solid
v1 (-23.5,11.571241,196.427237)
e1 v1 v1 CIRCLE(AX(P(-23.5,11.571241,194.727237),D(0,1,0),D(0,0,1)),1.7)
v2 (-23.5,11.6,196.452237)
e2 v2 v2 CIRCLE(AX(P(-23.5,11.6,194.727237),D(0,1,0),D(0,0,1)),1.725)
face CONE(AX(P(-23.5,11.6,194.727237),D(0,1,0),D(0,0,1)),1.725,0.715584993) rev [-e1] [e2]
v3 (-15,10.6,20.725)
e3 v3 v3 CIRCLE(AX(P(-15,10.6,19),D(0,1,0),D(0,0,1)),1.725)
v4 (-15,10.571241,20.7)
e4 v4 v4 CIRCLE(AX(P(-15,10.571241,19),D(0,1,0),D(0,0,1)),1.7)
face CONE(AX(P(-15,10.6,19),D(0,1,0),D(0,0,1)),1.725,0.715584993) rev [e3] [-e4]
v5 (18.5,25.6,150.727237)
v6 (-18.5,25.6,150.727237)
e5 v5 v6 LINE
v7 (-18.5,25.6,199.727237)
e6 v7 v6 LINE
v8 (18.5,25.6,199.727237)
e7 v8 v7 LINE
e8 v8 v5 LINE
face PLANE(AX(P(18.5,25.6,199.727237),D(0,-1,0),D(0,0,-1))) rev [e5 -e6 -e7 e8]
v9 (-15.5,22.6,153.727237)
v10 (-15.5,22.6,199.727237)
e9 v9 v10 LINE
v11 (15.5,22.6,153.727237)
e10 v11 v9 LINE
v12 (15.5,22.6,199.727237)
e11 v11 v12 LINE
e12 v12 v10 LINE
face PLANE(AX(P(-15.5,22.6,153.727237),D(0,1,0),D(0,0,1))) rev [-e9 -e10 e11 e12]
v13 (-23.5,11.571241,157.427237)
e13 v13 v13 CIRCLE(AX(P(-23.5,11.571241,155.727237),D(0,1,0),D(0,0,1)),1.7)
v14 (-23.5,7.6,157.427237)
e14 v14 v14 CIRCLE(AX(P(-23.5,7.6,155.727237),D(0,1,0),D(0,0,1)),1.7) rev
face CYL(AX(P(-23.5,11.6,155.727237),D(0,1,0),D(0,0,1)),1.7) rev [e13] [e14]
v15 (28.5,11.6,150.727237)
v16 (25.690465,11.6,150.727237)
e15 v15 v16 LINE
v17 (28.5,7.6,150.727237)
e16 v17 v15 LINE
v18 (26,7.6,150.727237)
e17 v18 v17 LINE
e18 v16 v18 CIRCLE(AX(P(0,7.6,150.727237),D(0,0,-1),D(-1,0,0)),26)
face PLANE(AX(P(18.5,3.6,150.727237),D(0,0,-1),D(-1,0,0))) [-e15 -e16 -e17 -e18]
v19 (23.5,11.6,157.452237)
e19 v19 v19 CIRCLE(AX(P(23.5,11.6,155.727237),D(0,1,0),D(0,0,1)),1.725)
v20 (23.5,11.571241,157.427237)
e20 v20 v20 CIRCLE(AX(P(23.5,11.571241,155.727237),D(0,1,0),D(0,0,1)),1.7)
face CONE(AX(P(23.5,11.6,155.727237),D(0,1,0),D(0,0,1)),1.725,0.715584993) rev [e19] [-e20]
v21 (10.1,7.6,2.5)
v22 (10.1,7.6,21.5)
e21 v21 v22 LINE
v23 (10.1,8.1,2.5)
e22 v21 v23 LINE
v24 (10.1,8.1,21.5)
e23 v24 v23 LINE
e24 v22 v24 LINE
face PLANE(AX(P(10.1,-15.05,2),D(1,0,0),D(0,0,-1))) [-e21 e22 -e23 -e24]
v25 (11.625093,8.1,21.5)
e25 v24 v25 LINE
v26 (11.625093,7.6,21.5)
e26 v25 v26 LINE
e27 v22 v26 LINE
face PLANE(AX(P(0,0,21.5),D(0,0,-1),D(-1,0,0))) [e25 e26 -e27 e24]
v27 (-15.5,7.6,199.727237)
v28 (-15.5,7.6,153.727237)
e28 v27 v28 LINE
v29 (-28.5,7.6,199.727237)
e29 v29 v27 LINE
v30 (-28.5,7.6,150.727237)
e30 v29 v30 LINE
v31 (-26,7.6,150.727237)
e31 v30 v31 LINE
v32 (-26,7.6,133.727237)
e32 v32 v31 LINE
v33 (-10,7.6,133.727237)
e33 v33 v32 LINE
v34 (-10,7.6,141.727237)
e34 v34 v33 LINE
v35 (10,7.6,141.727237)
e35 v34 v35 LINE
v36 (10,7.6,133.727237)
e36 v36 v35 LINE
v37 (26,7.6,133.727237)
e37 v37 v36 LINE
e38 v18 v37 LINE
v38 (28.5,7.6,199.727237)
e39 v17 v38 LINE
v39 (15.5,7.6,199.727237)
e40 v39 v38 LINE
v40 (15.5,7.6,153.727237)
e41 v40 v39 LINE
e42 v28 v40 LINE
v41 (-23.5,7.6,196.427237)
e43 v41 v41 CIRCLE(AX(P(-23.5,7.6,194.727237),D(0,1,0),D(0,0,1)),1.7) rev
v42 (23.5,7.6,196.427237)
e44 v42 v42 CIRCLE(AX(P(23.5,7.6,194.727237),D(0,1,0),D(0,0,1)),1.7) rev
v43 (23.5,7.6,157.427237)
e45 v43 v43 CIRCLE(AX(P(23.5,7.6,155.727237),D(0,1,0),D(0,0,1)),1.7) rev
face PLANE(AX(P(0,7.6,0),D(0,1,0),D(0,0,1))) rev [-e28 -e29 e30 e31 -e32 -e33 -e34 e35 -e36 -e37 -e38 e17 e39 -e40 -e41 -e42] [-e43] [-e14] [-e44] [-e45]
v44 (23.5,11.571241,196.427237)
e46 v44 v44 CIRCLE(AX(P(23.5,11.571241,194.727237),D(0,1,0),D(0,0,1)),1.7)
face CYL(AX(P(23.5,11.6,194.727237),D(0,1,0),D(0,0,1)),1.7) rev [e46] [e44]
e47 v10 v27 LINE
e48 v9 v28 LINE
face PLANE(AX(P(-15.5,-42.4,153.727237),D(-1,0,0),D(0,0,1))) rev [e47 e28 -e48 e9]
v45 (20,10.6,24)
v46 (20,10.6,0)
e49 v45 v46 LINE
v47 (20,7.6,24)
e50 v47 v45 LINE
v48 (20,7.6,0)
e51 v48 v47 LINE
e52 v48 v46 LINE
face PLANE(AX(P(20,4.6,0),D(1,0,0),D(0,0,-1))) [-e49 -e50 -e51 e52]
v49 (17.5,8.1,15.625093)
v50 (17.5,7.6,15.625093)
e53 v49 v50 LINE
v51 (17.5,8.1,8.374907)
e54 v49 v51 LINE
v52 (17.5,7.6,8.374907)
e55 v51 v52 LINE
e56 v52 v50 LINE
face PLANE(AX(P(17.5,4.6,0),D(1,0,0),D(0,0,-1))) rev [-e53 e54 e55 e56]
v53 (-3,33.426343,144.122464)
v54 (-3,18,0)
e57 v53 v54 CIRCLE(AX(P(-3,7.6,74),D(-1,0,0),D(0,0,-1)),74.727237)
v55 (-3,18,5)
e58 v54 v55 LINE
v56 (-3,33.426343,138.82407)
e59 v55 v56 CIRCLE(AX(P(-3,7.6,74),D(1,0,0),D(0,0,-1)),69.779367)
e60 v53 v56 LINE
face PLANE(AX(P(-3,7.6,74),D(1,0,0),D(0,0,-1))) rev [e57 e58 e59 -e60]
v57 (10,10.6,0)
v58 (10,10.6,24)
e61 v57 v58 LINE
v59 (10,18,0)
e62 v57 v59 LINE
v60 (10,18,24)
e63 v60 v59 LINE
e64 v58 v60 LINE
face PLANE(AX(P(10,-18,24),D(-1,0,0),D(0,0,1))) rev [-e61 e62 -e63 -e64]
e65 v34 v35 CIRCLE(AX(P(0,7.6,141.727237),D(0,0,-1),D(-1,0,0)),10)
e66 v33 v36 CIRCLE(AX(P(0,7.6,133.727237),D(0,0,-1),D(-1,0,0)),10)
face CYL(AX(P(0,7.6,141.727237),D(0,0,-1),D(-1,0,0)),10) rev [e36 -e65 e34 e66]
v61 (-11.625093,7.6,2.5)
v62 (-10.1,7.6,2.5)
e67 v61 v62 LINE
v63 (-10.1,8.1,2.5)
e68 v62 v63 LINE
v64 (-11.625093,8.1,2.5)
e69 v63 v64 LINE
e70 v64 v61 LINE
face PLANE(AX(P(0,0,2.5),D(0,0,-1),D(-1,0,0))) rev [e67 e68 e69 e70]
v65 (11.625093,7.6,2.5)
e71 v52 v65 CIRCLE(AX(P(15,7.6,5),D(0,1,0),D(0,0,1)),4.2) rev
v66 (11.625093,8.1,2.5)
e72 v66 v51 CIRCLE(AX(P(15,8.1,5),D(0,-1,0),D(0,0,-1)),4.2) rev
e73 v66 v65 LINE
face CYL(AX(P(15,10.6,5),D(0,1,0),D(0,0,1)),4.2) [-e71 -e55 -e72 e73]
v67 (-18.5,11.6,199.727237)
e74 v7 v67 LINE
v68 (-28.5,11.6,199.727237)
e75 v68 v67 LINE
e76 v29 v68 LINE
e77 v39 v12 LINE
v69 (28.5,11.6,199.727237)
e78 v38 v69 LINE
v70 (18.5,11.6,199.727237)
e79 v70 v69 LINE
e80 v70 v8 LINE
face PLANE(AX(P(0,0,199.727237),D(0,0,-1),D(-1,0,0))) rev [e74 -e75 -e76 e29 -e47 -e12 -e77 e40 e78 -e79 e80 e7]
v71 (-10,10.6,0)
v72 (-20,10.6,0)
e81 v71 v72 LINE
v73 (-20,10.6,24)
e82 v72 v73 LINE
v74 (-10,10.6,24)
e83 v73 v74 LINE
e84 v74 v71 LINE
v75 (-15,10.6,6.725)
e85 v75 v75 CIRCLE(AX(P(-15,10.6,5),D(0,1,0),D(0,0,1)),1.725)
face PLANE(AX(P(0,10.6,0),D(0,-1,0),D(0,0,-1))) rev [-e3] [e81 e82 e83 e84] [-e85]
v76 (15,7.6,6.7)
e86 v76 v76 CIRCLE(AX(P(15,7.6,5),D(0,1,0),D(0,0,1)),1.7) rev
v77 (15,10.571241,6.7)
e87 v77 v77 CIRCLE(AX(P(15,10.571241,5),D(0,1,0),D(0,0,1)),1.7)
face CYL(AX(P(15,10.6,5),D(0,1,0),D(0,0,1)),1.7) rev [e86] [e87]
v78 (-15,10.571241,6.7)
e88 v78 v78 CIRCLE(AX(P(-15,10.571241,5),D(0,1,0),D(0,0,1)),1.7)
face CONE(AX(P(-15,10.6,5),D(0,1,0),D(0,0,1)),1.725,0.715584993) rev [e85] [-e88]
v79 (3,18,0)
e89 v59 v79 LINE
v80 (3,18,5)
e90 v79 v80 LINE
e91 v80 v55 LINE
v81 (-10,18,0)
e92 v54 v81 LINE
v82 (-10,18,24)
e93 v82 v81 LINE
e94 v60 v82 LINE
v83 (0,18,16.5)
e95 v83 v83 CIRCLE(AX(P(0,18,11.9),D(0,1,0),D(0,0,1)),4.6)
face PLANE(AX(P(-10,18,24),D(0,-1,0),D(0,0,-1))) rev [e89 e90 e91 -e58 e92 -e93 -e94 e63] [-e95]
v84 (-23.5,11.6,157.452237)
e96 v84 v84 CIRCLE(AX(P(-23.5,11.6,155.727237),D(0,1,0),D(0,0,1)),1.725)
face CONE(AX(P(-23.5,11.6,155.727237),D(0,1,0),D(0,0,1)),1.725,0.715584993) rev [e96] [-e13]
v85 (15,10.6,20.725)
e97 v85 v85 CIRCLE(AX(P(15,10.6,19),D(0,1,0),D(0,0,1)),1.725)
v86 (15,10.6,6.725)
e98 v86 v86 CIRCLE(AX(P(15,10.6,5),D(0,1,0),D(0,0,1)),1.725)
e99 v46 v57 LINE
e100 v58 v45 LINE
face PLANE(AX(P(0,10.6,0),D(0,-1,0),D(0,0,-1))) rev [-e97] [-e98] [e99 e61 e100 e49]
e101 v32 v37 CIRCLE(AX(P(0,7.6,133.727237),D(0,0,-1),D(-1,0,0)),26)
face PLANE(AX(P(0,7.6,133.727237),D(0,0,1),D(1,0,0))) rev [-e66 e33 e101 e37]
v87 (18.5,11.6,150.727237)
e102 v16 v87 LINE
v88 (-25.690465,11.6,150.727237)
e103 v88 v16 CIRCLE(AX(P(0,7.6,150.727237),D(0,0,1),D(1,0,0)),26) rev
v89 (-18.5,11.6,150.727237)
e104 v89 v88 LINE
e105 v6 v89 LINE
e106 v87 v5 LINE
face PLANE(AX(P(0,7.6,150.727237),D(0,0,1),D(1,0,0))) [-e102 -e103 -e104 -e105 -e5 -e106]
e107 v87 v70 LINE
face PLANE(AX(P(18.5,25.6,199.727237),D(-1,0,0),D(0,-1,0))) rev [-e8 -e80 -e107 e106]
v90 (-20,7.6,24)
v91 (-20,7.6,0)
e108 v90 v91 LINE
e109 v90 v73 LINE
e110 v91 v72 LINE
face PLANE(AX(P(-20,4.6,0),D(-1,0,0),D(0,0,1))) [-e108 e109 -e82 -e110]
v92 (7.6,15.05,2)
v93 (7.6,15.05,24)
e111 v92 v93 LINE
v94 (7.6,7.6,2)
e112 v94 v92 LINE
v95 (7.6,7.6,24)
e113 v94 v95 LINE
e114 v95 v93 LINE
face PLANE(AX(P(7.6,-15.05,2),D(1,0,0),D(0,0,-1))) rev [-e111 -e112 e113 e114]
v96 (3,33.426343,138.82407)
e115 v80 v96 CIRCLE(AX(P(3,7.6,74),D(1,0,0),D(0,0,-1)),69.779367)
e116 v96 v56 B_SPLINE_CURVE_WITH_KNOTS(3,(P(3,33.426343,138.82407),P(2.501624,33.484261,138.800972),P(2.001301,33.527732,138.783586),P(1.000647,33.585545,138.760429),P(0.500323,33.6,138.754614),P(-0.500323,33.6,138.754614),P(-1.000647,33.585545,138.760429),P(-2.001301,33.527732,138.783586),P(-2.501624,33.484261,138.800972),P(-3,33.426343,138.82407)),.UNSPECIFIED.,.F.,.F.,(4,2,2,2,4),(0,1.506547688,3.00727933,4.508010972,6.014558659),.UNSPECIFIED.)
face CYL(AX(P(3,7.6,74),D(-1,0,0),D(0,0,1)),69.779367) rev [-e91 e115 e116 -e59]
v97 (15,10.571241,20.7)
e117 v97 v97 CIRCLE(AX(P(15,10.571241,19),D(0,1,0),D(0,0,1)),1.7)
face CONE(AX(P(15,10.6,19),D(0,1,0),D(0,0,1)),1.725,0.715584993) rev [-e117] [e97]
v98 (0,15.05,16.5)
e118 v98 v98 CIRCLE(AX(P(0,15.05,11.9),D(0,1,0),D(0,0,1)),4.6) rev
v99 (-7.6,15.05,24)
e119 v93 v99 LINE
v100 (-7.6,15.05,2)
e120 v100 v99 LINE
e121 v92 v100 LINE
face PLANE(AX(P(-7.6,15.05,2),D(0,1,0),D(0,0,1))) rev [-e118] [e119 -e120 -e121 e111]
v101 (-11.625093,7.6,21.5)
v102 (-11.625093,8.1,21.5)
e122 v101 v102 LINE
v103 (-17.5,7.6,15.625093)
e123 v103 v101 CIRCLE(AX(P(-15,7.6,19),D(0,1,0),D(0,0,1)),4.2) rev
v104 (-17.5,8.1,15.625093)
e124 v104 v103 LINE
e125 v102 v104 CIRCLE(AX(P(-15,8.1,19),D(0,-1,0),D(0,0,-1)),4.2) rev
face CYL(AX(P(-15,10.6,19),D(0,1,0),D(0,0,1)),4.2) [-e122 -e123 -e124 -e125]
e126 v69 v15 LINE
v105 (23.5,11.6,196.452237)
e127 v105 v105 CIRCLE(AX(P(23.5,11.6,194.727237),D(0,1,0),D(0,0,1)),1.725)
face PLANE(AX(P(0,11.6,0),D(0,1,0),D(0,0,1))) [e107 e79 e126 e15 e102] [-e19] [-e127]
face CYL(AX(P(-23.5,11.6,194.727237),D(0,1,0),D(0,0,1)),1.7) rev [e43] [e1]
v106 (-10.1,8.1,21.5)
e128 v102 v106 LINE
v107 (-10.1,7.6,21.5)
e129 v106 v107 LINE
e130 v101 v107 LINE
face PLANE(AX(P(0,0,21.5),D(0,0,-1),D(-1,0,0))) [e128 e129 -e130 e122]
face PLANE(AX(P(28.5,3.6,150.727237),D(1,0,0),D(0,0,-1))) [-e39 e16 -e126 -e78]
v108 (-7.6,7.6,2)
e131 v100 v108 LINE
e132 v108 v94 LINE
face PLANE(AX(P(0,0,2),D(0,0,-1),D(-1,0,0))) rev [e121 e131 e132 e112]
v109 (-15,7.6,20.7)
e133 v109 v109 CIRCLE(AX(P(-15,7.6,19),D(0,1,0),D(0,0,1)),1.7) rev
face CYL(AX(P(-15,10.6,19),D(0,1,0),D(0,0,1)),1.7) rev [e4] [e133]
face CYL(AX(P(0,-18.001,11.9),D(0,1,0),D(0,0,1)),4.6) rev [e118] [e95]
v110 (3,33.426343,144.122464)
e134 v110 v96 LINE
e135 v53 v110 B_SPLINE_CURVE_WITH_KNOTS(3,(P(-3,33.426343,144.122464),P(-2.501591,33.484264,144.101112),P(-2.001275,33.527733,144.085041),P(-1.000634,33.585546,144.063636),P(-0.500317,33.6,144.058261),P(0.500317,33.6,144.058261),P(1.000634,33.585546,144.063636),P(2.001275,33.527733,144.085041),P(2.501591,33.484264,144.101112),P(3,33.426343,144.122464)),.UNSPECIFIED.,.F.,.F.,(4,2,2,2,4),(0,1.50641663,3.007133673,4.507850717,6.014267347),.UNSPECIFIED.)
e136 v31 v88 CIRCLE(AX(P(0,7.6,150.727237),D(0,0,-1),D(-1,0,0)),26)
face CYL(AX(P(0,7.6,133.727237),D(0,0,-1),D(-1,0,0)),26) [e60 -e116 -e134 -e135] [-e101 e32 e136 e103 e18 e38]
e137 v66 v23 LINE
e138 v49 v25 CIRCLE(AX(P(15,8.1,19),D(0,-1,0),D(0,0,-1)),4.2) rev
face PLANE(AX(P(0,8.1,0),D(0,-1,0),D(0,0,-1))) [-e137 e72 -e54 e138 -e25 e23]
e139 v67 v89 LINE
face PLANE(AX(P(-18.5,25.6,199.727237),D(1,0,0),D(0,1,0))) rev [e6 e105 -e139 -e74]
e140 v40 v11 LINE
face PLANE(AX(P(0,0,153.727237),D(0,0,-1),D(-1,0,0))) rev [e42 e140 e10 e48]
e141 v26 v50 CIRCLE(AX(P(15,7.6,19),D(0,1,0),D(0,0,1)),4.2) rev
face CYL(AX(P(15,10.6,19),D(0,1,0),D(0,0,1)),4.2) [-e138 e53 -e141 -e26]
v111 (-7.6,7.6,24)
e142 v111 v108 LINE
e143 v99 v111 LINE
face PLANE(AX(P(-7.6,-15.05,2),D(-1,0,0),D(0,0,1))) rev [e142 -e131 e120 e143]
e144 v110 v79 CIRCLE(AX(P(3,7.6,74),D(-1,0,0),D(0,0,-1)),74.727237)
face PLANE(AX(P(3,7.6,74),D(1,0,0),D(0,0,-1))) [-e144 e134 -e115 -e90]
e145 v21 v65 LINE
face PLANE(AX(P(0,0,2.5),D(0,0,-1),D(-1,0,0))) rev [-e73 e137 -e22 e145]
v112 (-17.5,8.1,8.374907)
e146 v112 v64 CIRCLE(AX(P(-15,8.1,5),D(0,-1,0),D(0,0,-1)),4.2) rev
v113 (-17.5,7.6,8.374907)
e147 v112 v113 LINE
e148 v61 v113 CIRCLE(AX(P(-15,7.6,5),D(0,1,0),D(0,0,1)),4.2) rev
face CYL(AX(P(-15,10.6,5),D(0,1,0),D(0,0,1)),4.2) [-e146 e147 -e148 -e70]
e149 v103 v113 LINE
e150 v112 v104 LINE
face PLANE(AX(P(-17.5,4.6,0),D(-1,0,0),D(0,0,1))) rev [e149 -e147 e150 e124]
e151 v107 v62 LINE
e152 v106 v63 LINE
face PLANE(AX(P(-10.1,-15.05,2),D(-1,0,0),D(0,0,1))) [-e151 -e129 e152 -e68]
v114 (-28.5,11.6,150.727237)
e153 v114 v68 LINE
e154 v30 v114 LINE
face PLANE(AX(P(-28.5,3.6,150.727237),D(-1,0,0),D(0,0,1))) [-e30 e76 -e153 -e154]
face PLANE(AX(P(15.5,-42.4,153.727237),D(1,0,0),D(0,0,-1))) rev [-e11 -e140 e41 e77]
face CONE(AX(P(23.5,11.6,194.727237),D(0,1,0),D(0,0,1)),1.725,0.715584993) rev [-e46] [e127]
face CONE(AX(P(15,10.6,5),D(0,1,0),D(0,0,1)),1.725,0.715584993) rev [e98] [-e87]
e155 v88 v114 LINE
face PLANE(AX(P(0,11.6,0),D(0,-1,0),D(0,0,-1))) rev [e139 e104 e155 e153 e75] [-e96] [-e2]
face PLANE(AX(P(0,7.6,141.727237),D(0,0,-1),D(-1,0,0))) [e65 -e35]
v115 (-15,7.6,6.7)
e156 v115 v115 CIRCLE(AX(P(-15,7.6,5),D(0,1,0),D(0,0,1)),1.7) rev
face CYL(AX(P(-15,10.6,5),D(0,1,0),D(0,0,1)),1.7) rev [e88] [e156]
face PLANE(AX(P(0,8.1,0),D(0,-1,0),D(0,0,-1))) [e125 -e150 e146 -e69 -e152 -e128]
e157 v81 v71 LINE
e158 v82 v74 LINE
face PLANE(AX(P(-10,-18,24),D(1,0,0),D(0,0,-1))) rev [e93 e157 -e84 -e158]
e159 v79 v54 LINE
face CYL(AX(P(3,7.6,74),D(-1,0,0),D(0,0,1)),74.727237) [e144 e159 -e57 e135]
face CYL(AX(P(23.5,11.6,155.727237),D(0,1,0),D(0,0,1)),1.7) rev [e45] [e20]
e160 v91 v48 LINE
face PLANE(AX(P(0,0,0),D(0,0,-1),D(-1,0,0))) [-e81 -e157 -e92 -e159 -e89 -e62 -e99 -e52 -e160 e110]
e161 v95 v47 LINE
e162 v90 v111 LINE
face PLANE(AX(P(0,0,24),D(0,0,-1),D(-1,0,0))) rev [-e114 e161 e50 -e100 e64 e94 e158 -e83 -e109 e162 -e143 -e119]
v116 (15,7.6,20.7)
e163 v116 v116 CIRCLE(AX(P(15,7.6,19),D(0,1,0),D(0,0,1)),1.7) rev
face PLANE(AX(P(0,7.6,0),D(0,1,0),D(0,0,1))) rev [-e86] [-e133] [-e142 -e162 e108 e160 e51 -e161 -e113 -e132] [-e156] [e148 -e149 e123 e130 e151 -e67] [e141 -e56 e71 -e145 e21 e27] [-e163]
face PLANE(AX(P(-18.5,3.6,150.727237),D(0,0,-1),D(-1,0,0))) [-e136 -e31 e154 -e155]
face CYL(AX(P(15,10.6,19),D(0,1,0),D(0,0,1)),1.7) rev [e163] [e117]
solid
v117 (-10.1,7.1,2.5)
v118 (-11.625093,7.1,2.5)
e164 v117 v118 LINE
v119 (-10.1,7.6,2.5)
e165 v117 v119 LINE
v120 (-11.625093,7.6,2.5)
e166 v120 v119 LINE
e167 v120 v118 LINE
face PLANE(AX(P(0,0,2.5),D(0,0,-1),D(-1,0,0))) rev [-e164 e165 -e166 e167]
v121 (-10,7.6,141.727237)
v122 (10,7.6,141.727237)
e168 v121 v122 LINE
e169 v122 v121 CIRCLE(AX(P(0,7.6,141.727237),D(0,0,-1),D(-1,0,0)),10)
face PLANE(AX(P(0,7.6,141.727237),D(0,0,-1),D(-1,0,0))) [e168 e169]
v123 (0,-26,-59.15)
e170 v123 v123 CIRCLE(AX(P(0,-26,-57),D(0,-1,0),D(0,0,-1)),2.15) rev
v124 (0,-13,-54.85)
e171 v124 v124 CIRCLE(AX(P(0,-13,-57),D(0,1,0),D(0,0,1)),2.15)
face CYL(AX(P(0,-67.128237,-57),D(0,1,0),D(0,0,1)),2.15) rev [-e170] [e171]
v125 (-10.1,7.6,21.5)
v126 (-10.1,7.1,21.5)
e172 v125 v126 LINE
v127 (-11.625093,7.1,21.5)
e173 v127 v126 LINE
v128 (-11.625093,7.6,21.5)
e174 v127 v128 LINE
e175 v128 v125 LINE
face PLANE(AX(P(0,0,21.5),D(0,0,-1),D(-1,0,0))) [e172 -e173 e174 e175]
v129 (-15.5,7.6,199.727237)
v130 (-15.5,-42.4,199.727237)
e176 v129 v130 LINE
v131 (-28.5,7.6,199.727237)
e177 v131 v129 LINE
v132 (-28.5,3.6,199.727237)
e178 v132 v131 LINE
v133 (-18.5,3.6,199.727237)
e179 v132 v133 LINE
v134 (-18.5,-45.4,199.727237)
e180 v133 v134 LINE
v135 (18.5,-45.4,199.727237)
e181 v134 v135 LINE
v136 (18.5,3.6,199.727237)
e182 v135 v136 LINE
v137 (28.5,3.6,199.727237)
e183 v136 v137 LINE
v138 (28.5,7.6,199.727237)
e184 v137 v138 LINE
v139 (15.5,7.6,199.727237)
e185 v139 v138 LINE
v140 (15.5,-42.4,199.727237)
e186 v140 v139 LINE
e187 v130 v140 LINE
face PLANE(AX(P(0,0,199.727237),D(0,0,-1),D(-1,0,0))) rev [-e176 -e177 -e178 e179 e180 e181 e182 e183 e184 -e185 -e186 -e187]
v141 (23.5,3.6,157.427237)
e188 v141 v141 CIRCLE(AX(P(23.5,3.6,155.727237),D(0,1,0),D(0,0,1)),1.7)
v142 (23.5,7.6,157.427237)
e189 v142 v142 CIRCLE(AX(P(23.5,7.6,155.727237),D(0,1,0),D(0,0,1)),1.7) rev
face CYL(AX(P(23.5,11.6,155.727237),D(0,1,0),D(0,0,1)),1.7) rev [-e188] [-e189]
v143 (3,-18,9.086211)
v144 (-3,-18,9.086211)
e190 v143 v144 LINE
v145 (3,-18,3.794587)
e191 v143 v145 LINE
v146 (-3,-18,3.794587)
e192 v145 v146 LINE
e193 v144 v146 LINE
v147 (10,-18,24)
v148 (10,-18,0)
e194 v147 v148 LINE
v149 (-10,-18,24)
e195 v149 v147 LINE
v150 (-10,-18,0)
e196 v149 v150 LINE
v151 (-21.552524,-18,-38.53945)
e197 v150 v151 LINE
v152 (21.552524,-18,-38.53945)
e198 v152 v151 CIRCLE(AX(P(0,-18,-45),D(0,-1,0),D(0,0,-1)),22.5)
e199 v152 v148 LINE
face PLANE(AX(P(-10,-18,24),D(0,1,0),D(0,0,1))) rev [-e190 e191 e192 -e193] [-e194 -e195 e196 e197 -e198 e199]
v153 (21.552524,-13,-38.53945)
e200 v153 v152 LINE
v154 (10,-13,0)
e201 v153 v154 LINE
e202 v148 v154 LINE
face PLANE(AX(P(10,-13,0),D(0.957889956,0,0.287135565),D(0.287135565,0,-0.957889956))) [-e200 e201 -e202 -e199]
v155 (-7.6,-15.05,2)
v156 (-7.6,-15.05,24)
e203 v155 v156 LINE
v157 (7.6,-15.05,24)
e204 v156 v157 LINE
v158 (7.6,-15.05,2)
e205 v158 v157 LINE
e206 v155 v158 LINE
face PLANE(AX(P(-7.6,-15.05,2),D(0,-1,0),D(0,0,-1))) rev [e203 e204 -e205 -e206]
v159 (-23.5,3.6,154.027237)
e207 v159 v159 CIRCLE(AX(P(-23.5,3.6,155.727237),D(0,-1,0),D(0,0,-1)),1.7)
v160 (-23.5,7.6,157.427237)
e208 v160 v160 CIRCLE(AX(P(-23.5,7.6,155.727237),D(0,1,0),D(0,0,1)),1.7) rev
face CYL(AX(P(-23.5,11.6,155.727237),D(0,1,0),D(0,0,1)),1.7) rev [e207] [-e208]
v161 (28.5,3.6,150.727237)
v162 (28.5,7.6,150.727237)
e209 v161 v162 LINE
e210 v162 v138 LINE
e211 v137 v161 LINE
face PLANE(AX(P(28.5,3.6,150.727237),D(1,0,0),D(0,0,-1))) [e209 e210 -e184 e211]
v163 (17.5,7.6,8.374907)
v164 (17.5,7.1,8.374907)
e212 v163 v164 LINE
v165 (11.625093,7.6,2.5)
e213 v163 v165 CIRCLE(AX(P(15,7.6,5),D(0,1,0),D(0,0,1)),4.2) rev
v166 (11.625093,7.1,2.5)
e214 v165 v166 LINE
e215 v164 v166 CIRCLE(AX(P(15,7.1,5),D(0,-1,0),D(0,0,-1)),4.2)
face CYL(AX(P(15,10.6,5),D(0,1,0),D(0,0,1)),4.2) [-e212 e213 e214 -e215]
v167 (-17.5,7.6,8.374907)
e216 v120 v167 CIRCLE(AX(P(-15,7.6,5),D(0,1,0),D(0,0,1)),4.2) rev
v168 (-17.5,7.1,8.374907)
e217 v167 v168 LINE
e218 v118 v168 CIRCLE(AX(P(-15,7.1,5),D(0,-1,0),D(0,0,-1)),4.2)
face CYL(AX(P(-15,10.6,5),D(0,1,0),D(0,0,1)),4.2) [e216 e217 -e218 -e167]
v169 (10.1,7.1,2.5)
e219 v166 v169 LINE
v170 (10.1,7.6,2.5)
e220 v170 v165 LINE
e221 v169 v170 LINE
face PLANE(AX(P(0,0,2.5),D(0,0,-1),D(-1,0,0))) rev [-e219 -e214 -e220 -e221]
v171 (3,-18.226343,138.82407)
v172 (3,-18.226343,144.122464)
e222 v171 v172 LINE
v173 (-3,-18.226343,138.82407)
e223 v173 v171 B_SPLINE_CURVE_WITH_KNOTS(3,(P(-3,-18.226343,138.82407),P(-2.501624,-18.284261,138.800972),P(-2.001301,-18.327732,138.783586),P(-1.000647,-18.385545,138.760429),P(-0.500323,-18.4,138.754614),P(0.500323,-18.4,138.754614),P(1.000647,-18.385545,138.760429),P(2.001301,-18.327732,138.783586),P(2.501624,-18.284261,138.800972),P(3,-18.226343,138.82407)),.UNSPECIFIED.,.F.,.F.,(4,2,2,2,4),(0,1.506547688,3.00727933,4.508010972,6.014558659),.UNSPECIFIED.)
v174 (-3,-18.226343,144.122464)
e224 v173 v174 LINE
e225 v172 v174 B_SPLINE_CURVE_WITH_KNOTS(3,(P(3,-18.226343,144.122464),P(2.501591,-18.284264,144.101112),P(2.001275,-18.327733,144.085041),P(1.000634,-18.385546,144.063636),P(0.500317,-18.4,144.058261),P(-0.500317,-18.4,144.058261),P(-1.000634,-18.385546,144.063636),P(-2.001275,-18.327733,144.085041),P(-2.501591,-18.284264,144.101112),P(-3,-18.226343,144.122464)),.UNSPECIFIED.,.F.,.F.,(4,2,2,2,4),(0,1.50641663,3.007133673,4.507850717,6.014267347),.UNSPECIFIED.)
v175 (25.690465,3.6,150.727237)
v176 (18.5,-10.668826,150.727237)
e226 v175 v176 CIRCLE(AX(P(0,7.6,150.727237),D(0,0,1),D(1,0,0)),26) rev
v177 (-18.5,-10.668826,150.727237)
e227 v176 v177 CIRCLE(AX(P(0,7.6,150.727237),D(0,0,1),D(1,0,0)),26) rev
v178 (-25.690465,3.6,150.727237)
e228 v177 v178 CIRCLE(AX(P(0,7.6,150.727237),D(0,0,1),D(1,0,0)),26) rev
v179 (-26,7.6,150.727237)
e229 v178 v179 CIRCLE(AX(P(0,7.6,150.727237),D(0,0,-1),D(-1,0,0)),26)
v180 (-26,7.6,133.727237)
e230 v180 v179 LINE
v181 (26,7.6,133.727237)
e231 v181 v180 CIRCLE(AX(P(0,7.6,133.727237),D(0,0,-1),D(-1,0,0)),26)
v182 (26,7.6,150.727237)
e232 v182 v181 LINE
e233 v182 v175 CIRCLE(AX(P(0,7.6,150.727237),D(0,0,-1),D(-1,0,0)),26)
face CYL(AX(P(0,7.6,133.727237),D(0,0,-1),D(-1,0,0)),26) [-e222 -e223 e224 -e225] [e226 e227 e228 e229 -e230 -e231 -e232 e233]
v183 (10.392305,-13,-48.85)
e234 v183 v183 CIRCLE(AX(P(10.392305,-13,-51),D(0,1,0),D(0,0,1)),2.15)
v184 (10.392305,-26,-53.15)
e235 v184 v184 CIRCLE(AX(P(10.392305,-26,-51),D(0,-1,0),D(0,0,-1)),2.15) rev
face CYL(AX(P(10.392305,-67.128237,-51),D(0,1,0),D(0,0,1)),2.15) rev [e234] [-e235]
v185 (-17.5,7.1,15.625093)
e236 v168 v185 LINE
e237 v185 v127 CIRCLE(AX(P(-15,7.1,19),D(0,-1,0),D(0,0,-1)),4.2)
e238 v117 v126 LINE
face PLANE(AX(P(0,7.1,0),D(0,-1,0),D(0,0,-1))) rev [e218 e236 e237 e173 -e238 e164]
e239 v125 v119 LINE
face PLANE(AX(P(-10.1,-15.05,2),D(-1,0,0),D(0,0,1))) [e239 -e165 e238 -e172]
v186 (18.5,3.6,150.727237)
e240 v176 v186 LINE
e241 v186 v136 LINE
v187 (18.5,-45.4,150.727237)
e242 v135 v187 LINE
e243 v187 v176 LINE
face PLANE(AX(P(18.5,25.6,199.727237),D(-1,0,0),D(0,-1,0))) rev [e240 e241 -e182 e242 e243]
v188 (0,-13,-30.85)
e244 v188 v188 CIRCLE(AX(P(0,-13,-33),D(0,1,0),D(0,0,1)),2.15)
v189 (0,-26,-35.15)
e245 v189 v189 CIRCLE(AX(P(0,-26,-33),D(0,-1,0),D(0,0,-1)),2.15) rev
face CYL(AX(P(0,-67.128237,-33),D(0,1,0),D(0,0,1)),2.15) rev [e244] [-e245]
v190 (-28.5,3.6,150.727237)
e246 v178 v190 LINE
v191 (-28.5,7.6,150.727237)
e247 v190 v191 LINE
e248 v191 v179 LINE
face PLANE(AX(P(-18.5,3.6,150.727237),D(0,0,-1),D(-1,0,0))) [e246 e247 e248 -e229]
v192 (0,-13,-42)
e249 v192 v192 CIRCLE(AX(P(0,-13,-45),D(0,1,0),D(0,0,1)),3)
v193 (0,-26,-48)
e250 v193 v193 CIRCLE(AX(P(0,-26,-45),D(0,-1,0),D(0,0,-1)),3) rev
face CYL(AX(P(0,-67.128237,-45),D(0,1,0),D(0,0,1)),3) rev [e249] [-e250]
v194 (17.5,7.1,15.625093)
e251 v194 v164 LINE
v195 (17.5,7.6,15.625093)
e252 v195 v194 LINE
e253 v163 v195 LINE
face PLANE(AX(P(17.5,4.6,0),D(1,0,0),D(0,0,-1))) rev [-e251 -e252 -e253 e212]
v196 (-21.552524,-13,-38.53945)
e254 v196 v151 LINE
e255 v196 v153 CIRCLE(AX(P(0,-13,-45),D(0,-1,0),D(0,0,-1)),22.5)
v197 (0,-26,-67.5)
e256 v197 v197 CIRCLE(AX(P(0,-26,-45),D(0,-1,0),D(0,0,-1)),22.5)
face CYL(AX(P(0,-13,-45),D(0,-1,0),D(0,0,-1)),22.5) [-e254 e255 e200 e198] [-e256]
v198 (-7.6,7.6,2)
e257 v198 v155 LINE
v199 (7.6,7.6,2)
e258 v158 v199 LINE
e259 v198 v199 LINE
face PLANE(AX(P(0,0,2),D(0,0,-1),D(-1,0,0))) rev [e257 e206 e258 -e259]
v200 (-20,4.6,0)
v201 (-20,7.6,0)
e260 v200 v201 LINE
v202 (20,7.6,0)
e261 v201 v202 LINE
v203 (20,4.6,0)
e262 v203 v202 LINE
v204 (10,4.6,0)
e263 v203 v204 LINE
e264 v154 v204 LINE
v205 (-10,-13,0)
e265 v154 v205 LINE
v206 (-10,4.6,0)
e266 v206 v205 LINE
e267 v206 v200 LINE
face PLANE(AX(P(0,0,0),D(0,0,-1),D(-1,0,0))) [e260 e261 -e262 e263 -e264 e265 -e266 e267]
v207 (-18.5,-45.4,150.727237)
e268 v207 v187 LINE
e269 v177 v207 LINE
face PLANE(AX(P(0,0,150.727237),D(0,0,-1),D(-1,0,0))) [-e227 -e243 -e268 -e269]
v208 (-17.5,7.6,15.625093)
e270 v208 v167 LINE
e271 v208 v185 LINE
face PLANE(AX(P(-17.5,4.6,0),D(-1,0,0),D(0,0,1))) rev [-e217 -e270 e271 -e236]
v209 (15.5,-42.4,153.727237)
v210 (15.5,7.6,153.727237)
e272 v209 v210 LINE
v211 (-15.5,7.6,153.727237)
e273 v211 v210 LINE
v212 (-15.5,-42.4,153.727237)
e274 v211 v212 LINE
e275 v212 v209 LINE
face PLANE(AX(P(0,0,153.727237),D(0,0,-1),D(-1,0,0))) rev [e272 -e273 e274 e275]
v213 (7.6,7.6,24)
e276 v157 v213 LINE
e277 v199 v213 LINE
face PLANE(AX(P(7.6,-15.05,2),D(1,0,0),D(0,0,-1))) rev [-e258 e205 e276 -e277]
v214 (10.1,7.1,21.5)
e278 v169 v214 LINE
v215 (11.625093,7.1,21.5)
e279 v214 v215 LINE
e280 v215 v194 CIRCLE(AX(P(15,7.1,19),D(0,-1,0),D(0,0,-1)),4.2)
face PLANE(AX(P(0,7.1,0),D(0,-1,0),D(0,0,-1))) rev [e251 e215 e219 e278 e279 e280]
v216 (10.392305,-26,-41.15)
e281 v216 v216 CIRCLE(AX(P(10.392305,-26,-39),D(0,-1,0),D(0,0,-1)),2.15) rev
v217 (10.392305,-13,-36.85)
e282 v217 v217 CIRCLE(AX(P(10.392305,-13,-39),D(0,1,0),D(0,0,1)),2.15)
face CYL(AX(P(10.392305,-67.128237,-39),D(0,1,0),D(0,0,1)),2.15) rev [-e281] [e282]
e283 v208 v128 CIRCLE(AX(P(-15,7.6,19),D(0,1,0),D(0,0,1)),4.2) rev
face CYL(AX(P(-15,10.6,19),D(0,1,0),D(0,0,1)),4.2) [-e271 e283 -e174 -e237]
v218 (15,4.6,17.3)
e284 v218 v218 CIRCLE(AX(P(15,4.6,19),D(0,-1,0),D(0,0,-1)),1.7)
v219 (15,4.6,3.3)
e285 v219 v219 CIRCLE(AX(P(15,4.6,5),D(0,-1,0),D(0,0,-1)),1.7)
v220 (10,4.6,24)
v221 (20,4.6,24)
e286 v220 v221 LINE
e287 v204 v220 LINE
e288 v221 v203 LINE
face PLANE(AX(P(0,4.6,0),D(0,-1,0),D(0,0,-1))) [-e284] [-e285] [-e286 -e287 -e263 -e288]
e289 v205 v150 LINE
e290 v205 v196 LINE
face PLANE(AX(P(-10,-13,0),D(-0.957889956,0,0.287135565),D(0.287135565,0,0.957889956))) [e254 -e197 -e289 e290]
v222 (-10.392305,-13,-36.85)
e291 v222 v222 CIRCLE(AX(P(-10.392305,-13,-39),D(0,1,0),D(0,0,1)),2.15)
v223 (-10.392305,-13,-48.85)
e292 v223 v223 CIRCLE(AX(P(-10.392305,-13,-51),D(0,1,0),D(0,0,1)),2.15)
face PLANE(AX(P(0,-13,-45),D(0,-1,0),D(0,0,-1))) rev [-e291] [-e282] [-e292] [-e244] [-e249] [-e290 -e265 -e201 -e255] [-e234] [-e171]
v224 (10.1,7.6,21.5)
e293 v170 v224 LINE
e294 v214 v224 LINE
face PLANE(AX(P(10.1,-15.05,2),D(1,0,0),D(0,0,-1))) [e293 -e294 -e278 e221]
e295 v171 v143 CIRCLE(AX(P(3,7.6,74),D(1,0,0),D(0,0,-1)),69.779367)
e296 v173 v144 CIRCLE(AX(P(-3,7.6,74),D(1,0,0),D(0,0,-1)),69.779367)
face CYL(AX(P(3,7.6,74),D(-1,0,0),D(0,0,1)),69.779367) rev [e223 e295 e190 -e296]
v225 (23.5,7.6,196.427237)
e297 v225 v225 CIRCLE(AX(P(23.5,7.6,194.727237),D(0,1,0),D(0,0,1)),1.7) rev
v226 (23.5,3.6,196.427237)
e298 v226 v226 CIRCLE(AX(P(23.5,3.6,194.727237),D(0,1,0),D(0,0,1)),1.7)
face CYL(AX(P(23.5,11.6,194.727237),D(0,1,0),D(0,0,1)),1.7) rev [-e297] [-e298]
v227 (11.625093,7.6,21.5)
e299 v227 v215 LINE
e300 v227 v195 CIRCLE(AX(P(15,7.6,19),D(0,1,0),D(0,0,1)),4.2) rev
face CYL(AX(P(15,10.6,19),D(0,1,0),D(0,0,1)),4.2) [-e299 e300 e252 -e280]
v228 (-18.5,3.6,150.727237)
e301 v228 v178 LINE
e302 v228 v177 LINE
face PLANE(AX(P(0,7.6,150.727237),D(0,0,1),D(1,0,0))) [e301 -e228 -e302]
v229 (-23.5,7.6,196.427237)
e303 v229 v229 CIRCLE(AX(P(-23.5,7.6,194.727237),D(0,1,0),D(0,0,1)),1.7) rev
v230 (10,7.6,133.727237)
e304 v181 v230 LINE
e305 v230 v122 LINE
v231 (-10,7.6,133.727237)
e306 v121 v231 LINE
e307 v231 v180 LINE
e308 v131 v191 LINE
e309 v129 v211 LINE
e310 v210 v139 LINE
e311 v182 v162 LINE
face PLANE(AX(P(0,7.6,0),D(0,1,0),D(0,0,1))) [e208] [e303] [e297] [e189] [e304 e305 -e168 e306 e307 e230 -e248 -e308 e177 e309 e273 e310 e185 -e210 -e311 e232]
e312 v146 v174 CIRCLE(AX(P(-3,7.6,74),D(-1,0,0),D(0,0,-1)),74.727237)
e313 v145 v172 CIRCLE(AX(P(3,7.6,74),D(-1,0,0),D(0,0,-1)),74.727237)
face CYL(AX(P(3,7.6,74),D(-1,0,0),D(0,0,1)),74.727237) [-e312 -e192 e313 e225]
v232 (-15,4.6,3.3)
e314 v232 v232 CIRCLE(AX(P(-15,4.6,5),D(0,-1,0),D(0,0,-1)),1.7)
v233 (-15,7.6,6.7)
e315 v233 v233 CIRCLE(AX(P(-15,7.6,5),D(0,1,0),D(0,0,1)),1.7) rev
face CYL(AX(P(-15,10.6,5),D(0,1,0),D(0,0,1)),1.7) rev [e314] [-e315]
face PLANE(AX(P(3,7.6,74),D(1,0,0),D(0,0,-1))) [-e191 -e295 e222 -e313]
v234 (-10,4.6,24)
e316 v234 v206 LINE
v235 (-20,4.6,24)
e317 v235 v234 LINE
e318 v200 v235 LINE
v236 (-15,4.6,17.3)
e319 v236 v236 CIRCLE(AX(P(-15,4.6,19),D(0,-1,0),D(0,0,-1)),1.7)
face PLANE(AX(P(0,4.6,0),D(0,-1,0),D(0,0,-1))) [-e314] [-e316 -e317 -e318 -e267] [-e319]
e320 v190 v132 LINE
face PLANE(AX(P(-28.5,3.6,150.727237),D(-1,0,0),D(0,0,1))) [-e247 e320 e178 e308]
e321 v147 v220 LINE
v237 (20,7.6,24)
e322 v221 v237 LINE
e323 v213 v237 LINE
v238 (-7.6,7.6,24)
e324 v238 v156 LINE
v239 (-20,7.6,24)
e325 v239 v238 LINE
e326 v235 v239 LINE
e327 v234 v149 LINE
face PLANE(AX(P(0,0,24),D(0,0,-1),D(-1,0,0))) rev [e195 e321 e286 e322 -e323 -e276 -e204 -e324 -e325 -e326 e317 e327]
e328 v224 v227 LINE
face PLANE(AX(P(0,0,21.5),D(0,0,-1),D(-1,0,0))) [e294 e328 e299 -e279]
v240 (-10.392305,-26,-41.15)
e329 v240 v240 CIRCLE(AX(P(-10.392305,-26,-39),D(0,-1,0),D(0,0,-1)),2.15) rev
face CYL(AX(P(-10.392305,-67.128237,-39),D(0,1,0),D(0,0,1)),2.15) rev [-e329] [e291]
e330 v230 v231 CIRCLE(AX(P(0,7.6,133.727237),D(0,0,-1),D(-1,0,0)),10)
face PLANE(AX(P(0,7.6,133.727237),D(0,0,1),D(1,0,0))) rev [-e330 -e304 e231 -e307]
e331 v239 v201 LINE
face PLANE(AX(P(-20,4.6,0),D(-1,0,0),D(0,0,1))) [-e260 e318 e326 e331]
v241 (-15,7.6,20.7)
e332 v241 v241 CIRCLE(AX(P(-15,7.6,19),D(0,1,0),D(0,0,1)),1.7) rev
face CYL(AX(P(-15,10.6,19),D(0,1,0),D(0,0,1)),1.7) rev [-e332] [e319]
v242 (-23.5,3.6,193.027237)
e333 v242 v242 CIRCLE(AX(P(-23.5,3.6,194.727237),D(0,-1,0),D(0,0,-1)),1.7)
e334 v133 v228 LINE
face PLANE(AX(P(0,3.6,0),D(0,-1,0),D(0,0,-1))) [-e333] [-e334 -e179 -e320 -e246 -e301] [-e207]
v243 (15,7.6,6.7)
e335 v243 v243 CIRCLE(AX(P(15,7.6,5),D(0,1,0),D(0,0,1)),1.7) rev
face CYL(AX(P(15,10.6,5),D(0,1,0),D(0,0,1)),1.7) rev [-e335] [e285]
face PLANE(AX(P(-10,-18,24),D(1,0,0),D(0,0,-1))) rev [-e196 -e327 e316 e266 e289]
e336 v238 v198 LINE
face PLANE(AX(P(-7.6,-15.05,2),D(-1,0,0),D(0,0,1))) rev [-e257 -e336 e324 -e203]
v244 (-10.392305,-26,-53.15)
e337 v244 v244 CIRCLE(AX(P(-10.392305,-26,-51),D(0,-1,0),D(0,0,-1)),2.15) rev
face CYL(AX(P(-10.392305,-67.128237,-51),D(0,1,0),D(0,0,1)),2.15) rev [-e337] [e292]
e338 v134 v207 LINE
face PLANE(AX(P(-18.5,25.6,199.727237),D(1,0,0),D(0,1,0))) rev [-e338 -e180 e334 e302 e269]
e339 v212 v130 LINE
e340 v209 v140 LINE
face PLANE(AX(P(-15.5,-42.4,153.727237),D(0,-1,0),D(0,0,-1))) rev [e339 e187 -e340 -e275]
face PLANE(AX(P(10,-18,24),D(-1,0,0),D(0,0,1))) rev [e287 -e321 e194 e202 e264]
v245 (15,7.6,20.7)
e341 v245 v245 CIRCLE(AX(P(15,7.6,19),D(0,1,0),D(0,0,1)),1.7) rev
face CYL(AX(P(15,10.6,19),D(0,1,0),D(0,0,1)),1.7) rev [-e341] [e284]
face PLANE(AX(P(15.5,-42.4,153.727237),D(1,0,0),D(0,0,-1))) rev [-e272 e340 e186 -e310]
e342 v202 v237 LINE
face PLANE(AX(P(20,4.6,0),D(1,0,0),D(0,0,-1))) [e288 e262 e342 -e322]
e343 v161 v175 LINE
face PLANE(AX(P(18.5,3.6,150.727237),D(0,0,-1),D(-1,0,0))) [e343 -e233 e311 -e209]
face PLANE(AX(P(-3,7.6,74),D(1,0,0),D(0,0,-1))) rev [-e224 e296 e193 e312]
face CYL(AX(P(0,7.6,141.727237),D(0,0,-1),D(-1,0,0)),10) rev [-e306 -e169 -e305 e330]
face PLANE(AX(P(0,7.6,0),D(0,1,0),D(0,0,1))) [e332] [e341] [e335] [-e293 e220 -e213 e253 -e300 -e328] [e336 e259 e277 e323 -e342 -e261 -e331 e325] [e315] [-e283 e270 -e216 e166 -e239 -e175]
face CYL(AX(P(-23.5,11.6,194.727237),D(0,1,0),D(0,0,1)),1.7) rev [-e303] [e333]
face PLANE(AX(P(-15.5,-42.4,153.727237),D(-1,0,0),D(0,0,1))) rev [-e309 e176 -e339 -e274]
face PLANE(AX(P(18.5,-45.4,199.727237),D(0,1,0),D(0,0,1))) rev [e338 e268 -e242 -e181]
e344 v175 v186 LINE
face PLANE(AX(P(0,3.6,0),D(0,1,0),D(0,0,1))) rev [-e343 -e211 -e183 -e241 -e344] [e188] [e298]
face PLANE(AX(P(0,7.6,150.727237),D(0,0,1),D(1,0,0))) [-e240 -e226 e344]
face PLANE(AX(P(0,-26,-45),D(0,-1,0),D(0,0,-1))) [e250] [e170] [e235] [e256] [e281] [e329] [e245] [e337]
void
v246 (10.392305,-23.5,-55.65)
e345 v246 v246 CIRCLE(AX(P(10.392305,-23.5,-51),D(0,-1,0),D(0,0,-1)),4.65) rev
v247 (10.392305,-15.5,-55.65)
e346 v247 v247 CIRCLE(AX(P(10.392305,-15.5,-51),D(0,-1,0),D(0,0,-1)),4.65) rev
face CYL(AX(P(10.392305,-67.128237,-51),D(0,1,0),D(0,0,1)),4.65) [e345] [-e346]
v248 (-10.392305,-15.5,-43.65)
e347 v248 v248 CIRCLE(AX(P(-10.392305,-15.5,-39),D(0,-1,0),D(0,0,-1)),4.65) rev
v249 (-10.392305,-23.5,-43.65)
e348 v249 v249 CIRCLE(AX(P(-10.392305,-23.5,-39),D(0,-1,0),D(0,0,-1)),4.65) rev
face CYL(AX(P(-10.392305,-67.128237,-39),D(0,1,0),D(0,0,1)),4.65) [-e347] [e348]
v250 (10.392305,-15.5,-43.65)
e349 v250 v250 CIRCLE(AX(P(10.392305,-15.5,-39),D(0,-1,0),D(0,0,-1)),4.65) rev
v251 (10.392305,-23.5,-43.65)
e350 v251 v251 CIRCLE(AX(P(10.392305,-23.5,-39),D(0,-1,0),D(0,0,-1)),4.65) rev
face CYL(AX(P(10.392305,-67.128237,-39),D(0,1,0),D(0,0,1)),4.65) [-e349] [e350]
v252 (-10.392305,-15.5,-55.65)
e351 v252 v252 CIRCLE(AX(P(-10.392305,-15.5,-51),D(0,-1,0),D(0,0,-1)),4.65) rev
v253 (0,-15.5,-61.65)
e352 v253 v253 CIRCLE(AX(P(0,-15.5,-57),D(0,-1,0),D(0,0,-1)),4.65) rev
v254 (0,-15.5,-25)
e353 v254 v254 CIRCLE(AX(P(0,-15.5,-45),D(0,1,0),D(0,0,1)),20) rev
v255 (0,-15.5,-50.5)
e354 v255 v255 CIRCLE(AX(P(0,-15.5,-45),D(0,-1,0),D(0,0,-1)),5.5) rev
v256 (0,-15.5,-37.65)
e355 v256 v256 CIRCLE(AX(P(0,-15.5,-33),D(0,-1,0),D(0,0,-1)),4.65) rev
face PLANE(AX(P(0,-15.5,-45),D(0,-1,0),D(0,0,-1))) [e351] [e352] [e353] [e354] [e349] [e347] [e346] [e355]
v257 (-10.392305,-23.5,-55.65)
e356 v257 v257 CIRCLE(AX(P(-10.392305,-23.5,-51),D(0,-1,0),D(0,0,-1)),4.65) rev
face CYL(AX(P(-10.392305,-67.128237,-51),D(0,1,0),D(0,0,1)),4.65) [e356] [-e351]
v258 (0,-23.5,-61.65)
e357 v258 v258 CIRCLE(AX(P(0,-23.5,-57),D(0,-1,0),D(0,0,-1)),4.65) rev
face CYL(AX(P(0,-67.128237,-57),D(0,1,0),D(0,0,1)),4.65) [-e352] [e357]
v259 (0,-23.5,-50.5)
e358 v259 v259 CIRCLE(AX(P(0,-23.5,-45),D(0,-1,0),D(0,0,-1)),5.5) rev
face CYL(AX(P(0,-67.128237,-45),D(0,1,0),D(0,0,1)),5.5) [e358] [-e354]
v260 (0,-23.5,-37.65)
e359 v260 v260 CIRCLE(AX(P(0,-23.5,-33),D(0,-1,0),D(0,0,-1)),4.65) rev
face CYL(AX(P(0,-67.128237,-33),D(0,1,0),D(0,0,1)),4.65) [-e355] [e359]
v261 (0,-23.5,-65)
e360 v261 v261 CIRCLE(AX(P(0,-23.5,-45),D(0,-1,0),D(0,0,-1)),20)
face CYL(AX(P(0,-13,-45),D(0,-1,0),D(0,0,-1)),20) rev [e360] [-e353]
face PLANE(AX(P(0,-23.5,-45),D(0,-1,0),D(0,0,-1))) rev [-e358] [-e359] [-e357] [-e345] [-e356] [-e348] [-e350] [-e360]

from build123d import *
from build123d.topology import SkipClean

# Parameters (mm, degrees)
SKETCH_1_W           = 20
SKETCH_1_H           = 36
EXTRUDE_1_DEPTH      = 24
SKETCH_2_W           = 15.2
SKETCH_2_H           = 30.1
CUT_EXTRUDE_1_DEPTH  = 22
CUT_EXTRUDE_2_REACH  = 46.407
SKETCH_3_R           = 4.6
EXTRUDE_2_DEPTH      = 3
EXTRUDE_2_DEPTH_BACK = 3
SKETCH_6_W           = 35
SKETCH_6_H           = 26
SKETCH_7_R           = 23
CUT_EXTRUDE_3_DEPTH  = 18
SKETCH_9_R           = 10
CUT_EXTRUDE_4_DEPTH  = 8
EXTRUDE_4_DEPTH      = 3
EXTRUDE_4_DEPTH_BACK = 3
SKETCH_12_W          = 10
SKETCH_12_H          = 24
EXTRUDE_5_DEPTH      = 5
SKETCH_16_R          = 22.5
EXTRUDE_6_DEPTH      = 8
SKETCH_17_R          = 3
SKETCH_17_R_2        = 2.15
CUT_EXTRUDE_6_DEPTH  = 13
CUT_EXTRUDE_START    = -18
SKETCH_18_R          = 26
CUT_EXTRUDE_7_DEPTH  = 18
SKETCH_20_W          = 37
SKETCH_20_H          = 71
EXTRUDE_7_DEPTH      = 49
SHELL_START          = -23.5
SHELL_1_OUTLINE_R    = 20
SHELL_1_OUTLINE_R_2  = 4.65
SHELL_1_OUTLINE_R_3  = 5.5
SHELL_1_DEPTH        = 8
SHELL_START_2        = 7.1
SHELL_1_2_DEPTH      = 1
SKETCH_21_W          = 31
SKETCH_21_H          = 65
CUT_EXTRUDE_8_DEPTH  = 46
EXTRUDE_8_DEPTH      = 4
EXTRUDE_8_DEPTH_BACK = 4
SKETCH_22_W          = 10
SKETCH_22_H          = 49


# Read off the part's stored shape, not the designer's step: M3 すきま穴1, ｼｪﾙ1, M3 すきま穴2
with BuildPart() as part:
    # ｽｹｯﾁ1 → ﾎﾞｽ - 押し出し1 (new body)
    with BuildSketch(Plane.XY):
        Rectangle(SKETCH_1_W, SKETCH_1_H)
    extrude(amount=EXTRUDE_1_DEPTH)

    # ｽｹｯﾁ2 → ｶｯﾄ - 押し出し1 (cut)
    with BuildSketch(Plane.XY.offset(24)):
        Rectangle(SKETCH_2_W, SKETCH_2_H)
    extrude(amount=-CUT_EXTRUDE_1_DEPTH, mode=Mode.SUBTRACT)

    # ｽｹｯﾁ3 → ｶｯﾄ - 押し出し2 (cut, up to next)
    with BuildSketch(Plane(origin=(0, 18, 0), x_dir=(1, 0, 0), z_dir=(0, 1, 0)), mode=Mode.PRIVATE) as cut_extrude_2_sk1:
        with Locations(Location((0, -11.9, 0), (0, 0, 270))):
            Circle(SKETCH_3_R)
    cut_extrude_2_tool1 = extrude(cut_extrude_2_sk1.sketch, amount=-CUT_EXTRUDE_2_REACH, mode=Mode.PRIVATE) & part.part
    add(cut_extrude_2_tool1.solids().sort_by_distance((0, 18, 11.9))[0], mode=Mode.SUBTRACT)

    # ｽｹｯﾁ4 → ﾎﾞｽ - 押し出し2 (add, two sides: drawn at the far end of the back side and taken through both)
    with BuildSketch(Plane.ZY.offset(-EXTRUDE_2_DEPTH_BACK)):
        with BuildLine():
            Line((0, 18), (5, 18))
            ThreePointArc((5, 18), (143.334159834, 15.469833551), (9.086211018, -18))
            Line((9.086211018, -18), (3.794587103, -18))
            ThreePointArc((3.794587103, -18), (148.315545327, 15.433244719), (0, 18))
        make_face()
    extrude(amount=EXTRUDE_2_DEPTH + EXTRUDE_2_DEPTH_BACK)

    # ｽｹｯﾁ6 → 回転1 (revolve)
    with BuildSketch(Plane.ZY, mode=Mode.PRIVATE) as revolve_1_sk:
        with Locations((151.227237337, 20.6)):
            Rectangle(SKETCH_6_W, SKETCH_6_H)
    revolve(revolve_1_sk.sketch.rotate(Axis((0, 7.6, 133.727237337), (0, 0, 1)), 90), axis=Axis((0, 7.6, 133.727237337), (0, 0, 1)))

    # ｽｹｯﾁ7 → ｶｯﾄ - 押し出し3 (cut)
    with BuildSketch(Plane.XY.offset(168.727237337)):
        with Locations((0, 7.6)):
            Circle(SKETCH_7_R)
    extrude(amount=-CUT_EXTRUDE_3_DEPTH, mode=Mode.SUBTRACT)

    # ｽｹｯﾁ9 → ｶｯﾄ - 押し出し4 (cut)
    with BuildSketch(Plane(origin=(0, 0, 133.727237337), x_dir=(-1, 0, 0), z_dir=(0, 0, -1))):
        with Locations((0, 7.6)):
            Circle(SKETCH_9_R)
    extrude(amount=-CUT_EXTRUDE_4_DEPTH, mode=Mode.SUBTRACT)

    # ｽｹｯﾁ12 → ﾎﾞｽ - 押し出し4 (add, two sides: drawn at the far end of the back side and taken through both)
    with BuildSketch(Plane(origin=(0, 7.6, 0), x_dir=(1, 0, 0), z_dir=(0, 1, 0)).offset(-EXTRUDE_4_DEPTH_BACK)):
        with Locations((-15, -12)):
            Rectangle(SKETCH_12_W, SKETCH_12_H)
        with Locations((15, -12)):
            Rectangle(SKETCH_12_W, SKETCH_12_H)
    extrude(amount=EXTRUDE_4_DEPTH + EXTRUDE_4_DEPTH_BACK)

    # M3 すきま穴1 outline → M3 すきま穴1 (revolve, cut)
    with BuildSketch(Plane(origin=(-15, 0, 5), x_dir=(1, 0, 0), z_dir=(0, 0, 1))):
        Polygon((0, 4.6), (1.7, 4.6), (1.7, 10.57124079), (1.725, 10.6), (0, 10.6), align=None)
    revolve(axis=Axis((-15, 0, 5), (0, 1, 0)), mode=Mode.SUBTRACT)

    # Hole Wizard M3 _1 2 outline → Hole Wizard M3 _1 2 (revolve, cut)
    with BuildSketch(Plane(origin=(15, 0, 19), x_dir=(1, 0, 0), z_dir=(0, 0, 1))):
        Polygon((0, 4.6), (1.7, 4.6), (1.7, 10.57124079), (1.725, 10.6), (0, 10.6), align=None)
    revolve(axis=Axis((15, 0, 19), (0, 1, 0)), mode=Mode.SUBTRACT)

    # Hole Wizard M3 _1 3 outline → Hole Wizard M3 _1 3 (revolve, cut)
    with BuildSketch(Plane(origin=(-15, 0, 19), x_dir=(1, 0, 0), z_dir=(0, 0, 1))):
        Polygon((0, 4.6), (1.7, 4.6), (1.7, 10.57124079), (1.725, 10.6), (0, 10.6), align=None)
    revolve(axis=Axis((-15, 0, 19), (0, 1, 0)), mode=Mode.SUBTRACT)

    # Hole Wizard M3 _1 4 outline → Hole Wizard M3 _1 4 (revolve, cut)
    with BuildSketch(Plane(origin=(15, 0, 5), x_dir=(1, 0, 0), z_dir=(0, 0, 1))):
        Polygon((0, 4.6), (1.7, 4.6), (1.7, 10.57124079), (1.725, 10.6), (0, 10.6), align=None)
    revolve(axis=Axis((15, 0, 5), (0, 1, 0)), mode=Mode.SUBTRACT)


with BuildPart() as body_2:
    # Split Bodies 1: the piece on the far side of the plane
    add(part.part)
    split(bisect_by=Plane.ZX.offset(7.6), keep=Keep.BOTTOM)

    # ｽｹｯﾁ15 → ﾎﾞｽ - 押し出し5 (add)
    with BuildSketch(Plane.XZ.offset(18)):
        with BuildLine():
            Line((-10, 0), (-21.552524001, -38.539449778))
            ThreePointArc((-21.552524001, -38.539449778), (0, -67.5), (21.552524001, -38.539449778))
            Line((21.552524001, -38.539449778), (10, 0))
            Line((10, 0), (-10, 0))
        make_face()
    extrude(amount=-EXTRUDE_5_DEPTH)

    # ｽｹｯﾁ16 → ﾎﾞｽ - 押し出し6 (add)
    with SkipClean():  # the faces are left unmerged after this step: merging them gives an invalid solid
        with BuildSketch(Plane.XZ.offset(18)):
            with Locations(Location((0, -45, 0), (0, 0, 270))):
                Circle(SKETCH_16_R)
        extrude(amount=EXTRUDE_6_DEPTH)

    # ｽｹｯﾁ17 → ｶｯﾄ - 押し出し6 (cut)
    with SkipClean():  # the faces are left unmerged after this step: merging them gives an invalid solid
        with BuildSketch(Plane(origin=(0, -13, 0), x_dir=(1, 0, 0), z_dir=(0, 1, 0))):
            with Locations(Location((0, 45, 0), (0, 0, 270))):
                Circle(SKETCH_17_R)
            with Locations(Location((0, 57, 0), (0, 0, 270))):
                Circle(SKETCH_17_R_2)
            with Locations(Location((10.392304845, 51, 0), (0, 0, 270))):
                Circle(SKETCH_17_R_2)
            with Locations(Location((10.392304845, 39, 0), (0, 0, 270))):
                Circle(SKETCH_17_R_2)
            with Locations(Location((0, 33, 0), (0, 0, 270))):
                Circle(SKETCH_17_R_2)
            with Locations(Location((-10.392304845, 39, 0), (0, 0, 270))):
                Circle(SKETCH_17_R_2)
            with Locations(Location((-10.392304845, 51, 0), (0, 0, 270))):
                Circle(SKETCH_17_R_2)
        extrude(amount=-CUT_EXTRUDE_6_DEPTH, mode=Mode.SUBTRACT)


with BuildPart() as part_1:
    add(part.part)

    # Split Bodies 1
    split(bisect_by=Plane.ZX.offset(7.6), keep=Keep.TOP)


with BuildPart() as cut_extrude_7_tool:
    # ｽｹｯﾁ18 → ｶｯﾄ - 押し出し7 (new body)
    with SkipClean():  # the faces are left unmerged after this step: merging them gives an invalid solid
        with BuildSketch(Plane.XY.offset(168.727237337).offset(CUT_EXTRUDE_START)):
            with Locations((0, 7.6)):
                Circle(SKETCH_18_R)
        extrude(amount=CUT_EXTRUDE_7_DEPTH)


with BuildPart() as part_2:
    with SkipClean():  # the faces are left unmerged after this step: merging them gives an invalid solid
        add(part_1.part)

        # ｶｯﾄ - 押し出し7: cut by cut_extrude_7_tool
        add(cut_extrude_7_tool.part, mode=Mode.SUBTRACT)



with BuildPart() as body_2_1:
    with SkipClean():  # the faces are left unmerged after this step: merging them gives an invalid solid
        add(body_2.part)

        # ｶｯﾄ - 押し出し7: cut by cut_extrude_7_tool
        add(cut_extrude_7_tool.part, mode=Mode.SUBTRACT)


with BuildPart() as part_3:
    with SkipClean():  # the faces are left unmerged after this step: merging them gives an invalid solid
        add(part_2.part)

        add(body_2_1.part)  # ﾎﾞｽ - 押し出し7 merges body 2
        # ｽｹｯﾁ20 → ﾎﾞｽ - 押し出し7 (add)
        with BuildSketch(Plane.XY.offset(150.727237337)):
            with Locations((0, -9.9)):
                Rectangle(SKETCH_20_W, SKETCH_20_H)
        extrude(amount=EXTRUDE_7_DEPTH)

    # ｼｪﾙ1 outline → ｼｪﾙ1 (cut)
    with SkipClean():  # the faces are left unmerged after this step: merging them gives an invalid solid
        with BuildSketch(Plane(origin=(0, 0, 0), x_dir=(1, 0, 0), z_dir=(0, 1, 0)).offset(SHELL_START)):
            with Locations((0, 45)):
                Circle(SHELL_1_OUTLINE_R)
            with Locations((-10.392304845, 39)):
                Circle(SHELL_1_OUTLINE_R_2, mode=Mode.SUBTRACT)
            with Locations((-10.392304845, 51)):
                Circle(SHELL_1_OUTLINE_R_2, mode=Mode.SUBTRACT)
            with Locations((0, 33)):
                Circle(SHELL_1_OUTLINE_R_2, mode=Mode.SUBTRACT)
            with Locations((10.392304845, 39)):
                Circle(SHELL_1_OUTLINE_R_2, mode=Mode.SUBTRACT)
            with Locations((0, 45)):
                Circle(SHELL_1_OUTLINE_R_3, mode=Mode.SUBTRACT)
            with Locations((0, 57)):
                Circle(SHELL_1_OUTLINE_R_2, mode=Mode.SUBTRACT)
            with Locations((10.392304845, 51)):
                Circle(SHELL_1_OUTLINE_R_2, mode=Mode.SUBTRACT)
        extrude(amount=SHELL_1_DEPTH, mode=Mode.SUBTRACT)

    # Shell 1 2 outline → Shell 1 2 (cut)
    with SkipClean():  # the faces are left unmerged after this step: merging them gives an invalid solid
        with BuildSketch(Plane(origin=(0, 0, 0), x_dir=(1, 0, 0), z_dir=(0, 1, 0)).offset(SHELL_START_2)):
            with BuildLine():
                ThreePointArc((11.625092594, -21.5), (12.030151519, -16.030151519), (17.5, -15.625092594))
                Line((17.5, -15.625092594), (17.5, -8.374907406))
                ThreePointArc((17.5, -8.374907406), (12.030151519, -7.969848481), (11.625092594, -2.5))
                Line((11.625092594, -2.5), (10.1, -2.5))
                Line((10.1, -2.5), (10.1, -21.5))
                Line((10.1, -21.5), (11.625092594, -21.5))
            make_face()
            with BuildLine():
                Line((-11.625092594, -21.5), (-10.1, -21.5))
                Line((-10.1, -21.5), (-10.1, -2.5))
                Line((-10.1, -2.5), (-11.625092594, -2.5))
                ThreePointArc((-11.625092594, -2.5), (-12.030151519, -7.969848481), (-17.5, -8.374907406))
                Line((-17.5, -8.374907406), (-17.5, -15.625092594))
                ThreePointArc((-17.5, -15.625092594), (-12.030151519, -16.030151519), (-11.625092594, -21.5))
            make_face()
        extrude(amount=SHELL_1_2_DEPTH, mode=Mode.SUBTRACT)

    # ｽｹｯﾁ21 → ｶｯﾄ - 押し出し8 (cut)
    with SkipClean():  # the faces are left unmerged after this step: merging them gives an invalid solid
        with BuildSketch(Plane.XY.offset(199.727237337)):
            with Locations((0, -9.9)):
                Rectangle(SKETCH_21_W, SKETCH_21_H)
        extrude(amount=-CUT_EXTRUDE_8_DEPTH, mode=Mode.SUBTRACT)

    # ｽｹｯﾁ22 → ﾎﾞｽ - 押し出し8 (add, two sides: drawn at the far end of the back side and taken through both)
    with SkipClean():  # the faces are left unmerged after this step: merging them gives an invalid solid
        with BuildSketch(Plane(origin=(0, 7.6, 0), x_dir=(1, 0, 0), z_dir=(0, 1, 0)).offset(-EXTRUDE_8_DEPTH_BACK)):
            with Locations((23.5, -175.227237337)):
                Rectangle(SKETCH_22_W, SKETCH_22_H)
            with Locations((-23.5, -175.227237337)):
                Rectangle(SKETCH_22_W, SKETCH_22_H)
        extrude(amount=EXTRUDE_8_DEPTH + EXTRUDE_8_DEPTH_BACK)

    # M3 すきま穴2 outline → M3 すきま穴2 (revolve, cut)
    with SkipClean():  # the faces are left unmerged after this step: merging them gives an invalid solid
        with BuildSketch(Plane(origin=(23.5, 0, 155.727237337), x_dir=(1, 0, 0), z_dir=(0, 0, 1))):
            Polygon((0, 3.6), (1.7, 3.6), (1.7, 11.57124079), (1.725, 11.6), (0, 11.6), align=None)
        revolve(axis=Axis((23.5, 0, 155.727237337), (0, 1, 0)), mode=Mode.SUBTRACT)

    # Hole Wizard M3 _2 2 outline → Hole Wizard M3 _2 2 (revolve, cut)
    with SkipClean():  # the faces are left unmerged after this step: merging them gives an invalid solid
        with BuildSketch(Plane(origin=(23.5, 0, 194.727237337), x_dir=(1, 0, 0), z_dir=(0, 0, 1))):
            Polygon((0, 3.6), (1.7, 3.6), (1.7, 11.57124079), (1.725, 11.6), (0, 11.6), align=None)
        revolve(axis=Axis((23.5, 0, 194.727237337), (0, 1, 0)), mode=Mode.SUBTRACT)

    # Hole Wizard M3 _2 3 outline → Hole Wizard M3 _2 3 (revolve, cut)
    with SkipClean():  # the faces are left unmerged after this step: merging them gives an invalid solid
        with BuildSketch(Plane(origin=(-23.5, 0, 155.727237337), x_dir=(1, 0, 0), z_dir=(0, 0, 1))):
            Polygon((0, 3.6), (1.7, 3.6), (1.7, 11.57124079), (1.725, 11.6), (0, 11.6), align=None)
        revolve(axis=Axis((-23.5, 0, 155.727237337), (0, 1, 0)), mode=Mode.SUBTRACT)

    # Hole Wizard M3 _2 4 outline → Hole Wizard M3 _2 4 (revolve, cut)
    with SkipClean():  # the faces are left unmerged after this step: merging them gives an invalid solid
        with BuildSketch(Plane(origin=(-23.5, 0, 194.727237337), x_dir=(1, 0, 0), z_dir=(0, 0, 1))):
            Polygon((0, 3.6), (1.7, 3.6), (1.7, 11.57124079), (1.725, 11.6), (0, 11.6), align=None)
        revolve(axis=Axis((-23.5, 0, 194.727237337), (0, 1, 0)), mode=Mode.SUBTRACT)


with BuildPart() as body_2_2:
    # Split Bodies 2: the piece on the far side of the plane
    add(part_3.part)
    split(bisect_by=Plane.ZX.offset(7.6), keep=Keep.BOTTOM)


with BuildPart() as part_4:
    add(part_3.part)

    # Split Bodies 2
    split(bisect_by=Plane.ZX.offset(7.6), keep=Keep.TOP)


solid = Compound([body_2_2.part, part_4.part])
